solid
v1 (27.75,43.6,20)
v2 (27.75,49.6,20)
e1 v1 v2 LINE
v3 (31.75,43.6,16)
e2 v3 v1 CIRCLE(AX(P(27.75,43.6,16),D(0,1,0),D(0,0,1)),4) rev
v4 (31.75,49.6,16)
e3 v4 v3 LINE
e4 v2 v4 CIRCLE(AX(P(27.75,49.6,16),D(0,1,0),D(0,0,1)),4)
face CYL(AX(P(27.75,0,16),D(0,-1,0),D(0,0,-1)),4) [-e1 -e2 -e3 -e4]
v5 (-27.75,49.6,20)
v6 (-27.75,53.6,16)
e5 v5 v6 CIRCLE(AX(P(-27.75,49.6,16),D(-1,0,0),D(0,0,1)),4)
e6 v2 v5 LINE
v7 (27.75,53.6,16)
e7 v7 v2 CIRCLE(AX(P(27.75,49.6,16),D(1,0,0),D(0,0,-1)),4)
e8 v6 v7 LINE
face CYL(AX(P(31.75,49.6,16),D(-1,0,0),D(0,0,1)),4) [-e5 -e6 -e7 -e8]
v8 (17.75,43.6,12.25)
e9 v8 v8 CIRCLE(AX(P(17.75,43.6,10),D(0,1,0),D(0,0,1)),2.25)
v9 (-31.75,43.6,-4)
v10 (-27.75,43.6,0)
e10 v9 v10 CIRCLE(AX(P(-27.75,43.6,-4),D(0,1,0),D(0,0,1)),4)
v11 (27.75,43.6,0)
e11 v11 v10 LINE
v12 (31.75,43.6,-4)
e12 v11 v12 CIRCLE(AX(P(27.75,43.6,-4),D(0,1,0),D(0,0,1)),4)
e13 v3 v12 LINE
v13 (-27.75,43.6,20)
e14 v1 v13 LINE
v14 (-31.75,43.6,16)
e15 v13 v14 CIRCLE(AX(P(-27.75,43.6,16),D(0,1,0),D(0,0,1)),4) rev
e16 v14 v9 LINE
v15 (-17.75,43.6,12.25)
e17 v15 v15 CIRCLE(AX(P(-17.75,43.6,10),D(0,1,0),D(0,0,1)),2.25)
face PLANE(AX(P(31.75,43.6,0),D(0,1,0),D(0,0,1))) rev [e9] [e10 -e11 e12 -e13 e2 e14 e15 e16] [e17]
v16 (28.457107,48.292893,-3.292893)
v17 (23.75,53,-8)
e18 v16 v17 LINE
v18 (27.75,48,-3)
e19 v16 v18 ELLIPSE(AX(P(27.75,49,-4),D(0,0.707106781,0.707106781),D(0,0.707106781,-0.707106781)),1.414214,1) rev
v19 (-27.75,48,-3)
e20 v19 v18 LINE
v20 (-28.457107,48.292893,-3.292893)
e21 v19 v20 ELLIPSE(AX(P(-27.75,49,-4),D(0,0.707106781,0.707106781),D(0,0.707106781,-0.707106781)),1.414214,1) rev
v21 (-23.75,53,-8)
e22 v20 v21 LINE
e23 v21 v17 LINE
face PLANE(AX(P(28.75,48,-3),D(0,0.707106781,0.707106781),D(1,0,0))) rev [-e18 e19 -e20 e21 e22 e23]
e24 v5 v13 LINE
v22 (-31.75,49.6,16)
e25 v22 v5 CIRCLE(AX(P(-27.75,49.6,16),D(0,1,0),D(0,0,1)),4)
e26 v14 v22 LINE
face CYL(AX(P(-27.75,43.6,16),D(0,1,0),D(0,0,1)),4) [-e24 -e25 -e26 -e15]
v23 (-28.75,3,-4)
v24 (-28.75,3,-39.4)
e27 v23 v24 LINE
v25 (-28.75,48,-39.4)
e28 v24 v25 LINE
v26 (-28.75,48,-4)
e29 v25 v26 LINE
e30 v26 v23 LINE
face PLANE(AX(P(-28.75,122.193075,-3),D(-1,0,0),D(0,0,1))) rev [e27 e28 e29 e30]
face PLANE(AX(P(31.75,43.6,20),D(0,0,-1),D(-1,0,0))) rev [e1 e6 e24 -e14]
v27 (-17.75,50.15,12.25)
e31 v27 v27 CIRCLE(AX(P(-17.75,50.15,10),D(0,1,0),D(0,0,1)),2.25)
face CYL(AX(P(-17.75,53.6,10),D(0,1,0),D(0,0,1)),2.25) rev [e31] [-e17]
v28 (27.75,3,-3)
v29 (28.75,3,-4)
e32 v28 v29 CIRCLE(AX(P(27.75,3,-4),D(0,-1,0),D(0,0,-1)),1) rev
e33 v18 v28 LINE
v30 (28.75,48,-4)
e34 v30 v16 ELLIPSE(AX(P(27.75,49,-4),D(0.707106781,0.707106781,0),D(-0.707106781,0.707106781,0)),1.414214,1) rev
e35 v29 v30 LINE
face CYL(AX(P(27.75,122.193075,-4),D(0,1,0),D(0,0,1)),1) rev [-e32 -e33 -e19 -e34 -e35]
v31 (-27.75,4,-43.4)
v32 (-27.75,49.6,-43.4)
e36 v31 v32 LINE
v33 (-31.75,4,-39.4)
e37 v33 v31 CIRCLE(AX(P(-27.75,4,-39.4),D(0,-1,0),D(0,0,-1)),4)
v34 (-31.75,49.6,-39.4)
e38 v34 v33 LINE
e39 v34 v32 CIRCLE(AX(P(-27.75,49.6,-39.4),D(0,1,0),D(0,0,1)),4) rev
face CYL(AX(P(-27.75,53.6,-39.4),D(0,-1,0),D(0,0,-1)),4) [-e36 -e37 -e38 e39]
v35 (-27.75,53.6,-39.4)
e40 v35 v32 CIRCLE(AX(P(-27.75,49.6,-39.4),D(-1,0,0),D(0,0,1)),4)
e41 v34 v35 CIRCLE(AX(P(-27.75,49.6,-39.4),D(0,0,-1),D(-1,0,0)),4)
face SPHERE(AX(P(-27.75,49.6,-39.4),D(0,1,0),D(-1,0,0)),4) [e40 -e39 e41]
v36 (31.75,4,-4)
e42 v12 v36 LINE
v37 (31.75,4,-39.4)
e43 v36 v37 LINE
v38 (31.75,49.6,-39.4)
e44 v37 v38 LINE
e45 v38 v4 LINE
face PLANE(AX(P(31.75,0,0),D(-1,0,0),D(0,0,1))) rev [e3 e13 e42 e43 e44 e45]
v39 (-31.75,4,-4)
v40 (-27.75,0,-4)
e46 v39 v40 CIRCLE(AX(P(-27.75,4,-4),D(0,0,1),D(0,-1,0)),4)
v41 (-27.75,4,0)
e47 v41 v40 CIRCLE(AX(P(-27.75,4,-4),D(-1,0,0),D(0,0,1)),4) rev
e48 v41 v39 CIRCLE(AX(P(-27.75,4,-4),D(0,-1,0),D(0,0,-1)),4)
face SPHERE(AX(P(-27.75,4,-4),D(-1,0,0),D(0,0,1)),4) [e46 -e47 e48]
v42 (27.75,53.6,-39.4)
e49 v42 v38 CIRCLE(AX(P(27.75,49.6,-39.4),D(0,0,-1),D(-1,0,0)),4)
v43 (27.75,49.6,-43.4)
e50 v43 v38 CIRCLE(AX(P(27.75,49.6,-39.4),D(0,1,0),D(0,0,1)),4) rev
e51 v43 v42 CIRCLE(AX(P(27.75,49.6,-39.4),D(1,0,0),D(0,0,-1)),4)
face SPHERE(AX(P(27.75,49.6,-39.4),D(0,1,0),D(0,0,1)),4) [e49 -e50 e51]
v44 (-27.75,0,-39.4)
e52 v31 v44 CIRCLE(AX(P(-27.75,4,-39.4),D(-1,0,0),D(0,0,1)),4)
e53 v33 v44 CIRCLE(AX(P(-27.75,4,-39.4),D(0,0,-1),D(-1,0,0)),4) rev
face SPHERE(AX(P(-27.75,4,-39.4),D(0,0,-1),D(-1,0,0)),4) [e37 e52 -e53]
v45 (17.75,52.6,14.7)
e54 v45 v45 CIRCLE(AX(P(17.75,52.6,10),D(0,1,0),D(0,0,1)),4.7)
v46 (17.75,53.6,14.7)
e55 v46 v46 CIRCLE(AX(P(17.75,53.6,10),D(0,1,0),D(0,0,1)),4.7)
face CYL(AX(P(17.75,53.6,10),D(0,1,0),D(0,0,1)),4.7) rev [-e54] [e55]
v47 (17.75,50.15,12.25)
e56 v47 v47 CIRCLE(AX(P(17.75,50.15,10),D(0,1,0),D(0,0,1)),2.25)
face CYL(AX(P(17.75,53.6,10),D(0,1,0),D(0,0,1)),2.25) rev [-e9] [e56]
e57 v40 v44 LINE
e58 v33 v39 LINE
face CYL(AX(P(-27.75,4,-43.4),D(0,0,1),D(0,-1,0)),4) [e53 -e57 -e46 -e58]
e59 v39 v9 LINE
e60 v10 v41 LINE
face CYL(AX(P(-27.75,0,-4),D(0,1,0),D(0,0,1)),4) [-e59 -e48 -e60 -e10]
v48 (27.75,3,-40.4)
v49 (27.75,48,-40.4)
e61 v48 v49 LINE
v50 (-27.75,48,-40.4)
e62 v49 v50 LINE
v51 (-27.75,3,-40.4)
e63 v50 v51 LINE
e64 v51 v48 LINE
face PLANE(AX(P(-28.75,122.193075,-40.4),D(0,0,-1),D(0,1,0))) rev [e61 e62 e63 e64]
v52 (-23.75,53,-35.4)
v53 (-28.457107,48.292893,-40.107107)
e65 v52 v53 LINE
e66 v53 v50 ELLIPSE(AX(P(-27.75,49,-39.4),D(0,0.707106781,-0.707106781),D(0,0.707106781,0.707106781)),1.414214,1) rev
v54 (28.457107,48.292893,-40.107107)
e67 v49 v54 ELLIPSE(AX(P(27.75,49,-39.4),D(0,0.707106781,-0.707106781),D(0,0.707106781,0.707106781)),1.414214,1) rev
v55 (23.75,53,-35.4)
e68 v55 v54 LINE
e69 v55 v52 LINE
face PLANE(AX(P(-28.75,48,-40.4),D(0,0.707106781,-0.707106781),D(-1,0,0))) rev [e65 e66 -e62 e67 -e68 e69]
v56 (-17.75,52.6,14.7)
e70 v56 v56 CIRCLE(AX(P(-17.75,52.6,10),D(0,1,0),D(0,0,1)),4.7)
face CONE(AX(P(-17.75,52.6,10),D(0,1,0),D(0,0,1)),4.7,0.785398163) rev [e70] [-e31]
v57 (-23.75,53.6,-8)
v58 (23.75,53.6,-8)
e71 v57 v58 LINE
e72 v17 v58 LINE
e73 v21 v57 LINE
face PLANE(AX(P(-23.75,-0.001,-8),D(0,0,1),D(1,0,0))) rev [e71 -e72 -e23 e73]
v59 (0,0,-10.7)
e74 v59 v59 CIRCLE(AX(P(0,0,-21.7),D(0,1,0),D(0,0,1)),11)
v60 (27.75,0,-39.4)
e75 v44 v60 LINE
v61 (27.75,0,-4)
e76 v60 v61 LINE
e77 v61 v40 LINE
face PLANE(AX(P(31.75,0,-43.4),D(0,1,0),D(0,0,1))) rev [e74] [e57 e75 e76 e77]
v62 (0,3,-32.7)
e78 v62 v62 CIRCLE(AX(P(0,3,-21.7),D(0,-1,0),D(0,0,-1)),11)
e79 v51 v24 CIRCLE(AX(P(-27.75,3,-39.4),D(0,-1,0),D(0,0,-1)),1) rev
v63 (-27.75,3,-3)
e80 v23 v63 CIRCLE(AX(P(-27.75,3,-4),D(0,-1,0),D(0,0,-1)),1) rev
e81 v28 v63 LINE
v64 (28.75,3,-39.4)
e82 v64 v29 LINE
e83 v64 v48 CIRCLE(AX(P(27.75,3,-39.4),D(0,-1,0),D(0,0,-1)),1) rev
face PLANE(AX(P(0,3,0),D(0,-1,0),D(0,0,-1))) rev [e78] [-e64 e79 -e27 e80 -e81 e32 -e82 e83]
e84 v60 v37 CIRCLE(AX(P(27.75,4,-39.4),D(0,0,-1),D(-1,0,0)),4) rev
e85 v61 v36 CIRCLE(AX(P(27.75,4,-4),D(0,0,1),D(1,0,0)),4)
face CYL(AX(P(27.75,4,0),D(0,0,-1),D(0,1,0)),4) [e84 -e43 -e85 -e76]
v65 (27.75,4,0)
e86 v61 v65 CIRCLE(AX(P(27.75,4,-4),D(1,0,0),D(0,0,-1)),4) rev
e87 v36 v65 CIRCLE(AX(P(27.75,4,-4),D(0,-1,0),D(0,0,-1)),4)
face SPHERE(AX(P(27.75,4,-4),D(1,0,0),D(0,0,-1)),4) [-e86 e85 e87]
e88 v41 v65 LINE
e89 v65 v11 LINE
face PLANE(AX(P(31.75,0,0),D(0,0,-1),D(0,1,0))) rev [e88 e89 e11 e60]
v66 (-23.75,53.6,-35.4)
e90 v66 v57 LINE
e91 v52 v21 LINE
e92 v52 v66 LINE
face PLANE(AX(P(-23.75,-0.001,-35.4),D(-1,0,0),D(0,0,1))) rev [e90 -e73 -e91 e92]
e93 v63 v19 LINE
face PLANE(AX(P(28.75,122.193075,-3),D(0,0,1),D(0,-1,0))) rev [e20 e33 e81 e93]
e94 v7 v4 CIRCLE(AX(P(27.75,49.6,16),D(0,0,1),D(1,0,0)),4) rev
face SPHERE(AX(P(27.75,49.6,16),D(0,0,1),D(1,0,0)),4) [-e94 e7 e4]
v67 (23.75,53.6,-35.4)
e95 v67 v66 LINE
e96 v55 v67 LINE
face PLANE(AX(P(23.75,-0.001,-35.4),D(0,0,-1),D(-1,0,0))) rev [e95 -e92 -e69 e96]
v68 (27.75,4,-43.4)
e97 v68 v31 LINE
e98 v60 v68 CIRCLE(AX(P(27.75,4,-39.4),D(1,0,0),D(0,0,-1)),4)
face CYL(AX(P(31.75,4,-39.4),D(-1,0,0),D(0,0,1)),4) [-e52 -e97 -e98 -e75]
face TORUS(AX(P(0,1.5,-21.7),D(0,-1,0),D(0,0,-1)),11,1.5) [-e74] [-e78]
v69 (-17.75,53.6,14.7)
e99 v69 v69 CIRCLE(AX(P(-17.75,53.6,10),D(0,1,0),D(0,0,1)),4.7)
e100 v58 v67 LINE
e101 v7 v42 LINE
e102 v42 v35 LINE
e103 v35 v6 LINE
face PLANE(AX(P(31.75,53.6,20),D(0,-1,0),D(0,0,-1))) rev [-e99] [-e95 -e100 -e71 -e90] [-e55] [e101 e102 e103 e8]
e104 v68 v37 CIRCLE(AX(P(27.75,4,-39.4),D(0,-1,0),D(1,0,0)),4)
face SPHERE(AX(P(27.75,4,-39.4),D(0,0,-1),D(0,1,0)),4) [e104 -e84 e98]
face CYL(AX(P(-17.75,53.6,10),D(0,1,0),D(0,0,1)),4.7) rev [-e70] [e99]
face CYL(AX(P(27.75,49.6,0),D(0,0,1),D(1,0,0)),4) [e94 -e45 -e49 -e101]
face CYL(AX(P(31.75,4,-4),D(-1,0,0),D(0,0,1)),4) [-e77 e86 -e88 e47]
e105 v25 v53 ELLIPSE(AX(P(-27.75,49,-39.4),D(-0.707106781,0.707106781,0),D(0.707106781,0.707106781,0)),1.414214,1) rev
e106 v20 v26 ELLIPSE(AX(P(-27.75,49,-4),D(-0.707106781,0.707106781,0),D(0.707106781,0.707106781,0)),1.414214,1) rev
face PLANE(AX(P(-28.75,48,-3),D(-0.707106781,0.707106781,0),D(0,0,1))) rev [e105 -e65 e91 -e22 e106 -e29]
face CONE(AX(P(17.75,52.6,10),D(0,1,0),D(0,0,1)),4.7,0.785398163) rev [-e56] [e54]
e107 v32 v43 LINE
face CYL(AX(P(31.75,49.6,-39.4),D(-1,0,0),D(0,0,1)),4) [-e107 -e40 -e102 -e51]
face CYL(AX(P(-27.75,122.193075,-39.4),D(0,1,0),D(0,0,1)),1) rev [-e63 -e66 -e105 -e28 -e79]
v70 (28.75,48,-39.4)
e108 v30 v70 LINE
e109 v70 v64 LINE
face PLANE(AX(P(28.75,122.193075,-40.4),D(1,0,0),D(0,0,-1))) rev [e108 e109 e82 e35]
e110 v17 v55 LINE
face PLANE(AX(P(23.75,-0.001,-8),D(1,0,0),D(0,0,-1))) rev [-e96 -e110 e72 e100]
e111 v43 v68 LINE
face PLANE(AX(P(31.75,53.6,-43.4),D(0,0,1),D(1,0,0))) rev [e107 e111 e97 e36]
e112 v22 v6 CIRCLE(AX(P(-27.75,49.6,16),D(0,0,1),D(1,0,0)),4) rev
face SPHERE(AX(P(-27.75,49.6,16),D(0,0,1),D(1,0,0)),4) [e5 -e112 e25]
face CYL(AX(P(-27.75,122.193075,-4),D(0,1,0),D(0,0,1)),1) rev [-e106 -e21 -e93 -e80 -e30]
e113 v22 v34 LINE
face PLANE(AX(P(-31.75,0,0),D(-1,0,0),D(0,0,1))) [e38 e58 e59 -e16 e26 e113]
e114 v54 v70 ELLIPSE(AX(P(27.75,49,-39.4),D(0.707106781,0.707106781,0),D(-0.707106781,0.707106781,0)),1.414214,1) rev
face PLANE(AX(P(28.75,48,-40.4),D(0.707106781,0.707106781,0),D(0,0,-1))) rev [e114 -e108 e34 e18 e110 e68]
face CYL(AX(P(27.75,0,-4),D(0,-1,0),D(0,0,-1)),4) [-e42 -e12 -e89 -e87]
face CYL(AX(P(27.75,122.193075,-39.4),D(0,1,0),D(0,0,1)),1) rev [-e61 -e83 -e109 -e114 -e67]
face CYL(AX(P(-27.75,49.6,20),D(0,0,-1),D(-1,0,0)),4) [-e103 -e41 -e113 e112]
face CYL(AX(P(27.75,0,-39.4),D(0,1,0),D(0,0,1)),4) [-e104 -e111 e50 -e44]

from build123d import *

# Parameters (mm, degrees)
PROFILE_EXTRUDE_DEPTH         = 31.75
INTERIOR_START                = -3
INTERIOR_SKETCH_W             = 57.5
INTERIOR_SKETCH_H             = 37.4
INTERIOR_CUT_DEPTH            = 50
OPENING_CUT_REACH             = 77.925
OPENING_SKETCH_W              = 47.5
OPENING_SKETCH_H              = 27.4
INSIDE_TOP_CHAMFER_SIZE       = 5
INSIDE_FILLETS_R              = 1
WIRE_OUTLET_CUT_REACH         = 77.925
WIRE_OUTLET_CUT_SKETCH_R      = 9.5
WIRE_OUTLET_FILLET_R          = 1.5
TOP_FILLETS_R                 = 4
M4_MOUNTING_SCREWS_AT_2_COUNT = 2
M4_MOUNTING_SCREWS_AT_2_PITCH = 35.5


with BuildPart() as part:
    # Profile Sketch → Profile Extrude (new, symmetric)
    with BuildSketch(Plane(origin=(0, 0, 0), x_dir=(0, 0, -1), z_dir=(1, 0, 0))):
        Polygon((0, 0), (0, 43.6), (-20, 43.6), (-20, 53.6), (43.4, 53.6), (43.4, 0), align=None)
    extrude(amount=PROFILE_EXTRUDE_DEPTH, both=True)

    # Interior Sketch → Interior Cut (cut)
    with BuildSketch(Plane.XZ.offset(INTERIOR_START)):
        with Locations((0, -21.7)):
            Rectangle(INTERIOR_SKETCH_W, INTERIOR_SKETCH_H)
    extrude(amount=-INTERIOR_CUT_DEPTH, mode=Mode.SUBTRACT)

    # Opening Sketch → Opening Cut (cut, up to next)
    with BuildSketch(Plane(origin=(0, 53.6, 0), x_dir=(1, 0, 0), z_dir=(0, 1, 0)), mode=Mode.PRIVATE) as opening_cut_sk1:
        with Locations((0, 21.7)):
            Rectangle(OPENING_SKETCH_W, OPENING_SKETCH_H)
    opening_cut_tool1 = extrude(opening_cut_sk1.sketch, amount=-OPENING_CUT_REACH, mode=Mode.PRIVATE) & part.part
    add(opening_cut_tool1.solids().sort_by_distance((0, 53.6, -21.7))[0], mode=Mode.SUBTRACT)

    # Inside Top Chamfer
    inside_top_chamfer_edges = [part.edges().sort_by_distance(p)[0] for p in [
        (0, 53, -3),
        (28.75, 53, -21.7),
        (0, 53, -40.4),
        (-28.75, 53, -21.7),
    ]]
    chamfer(inside_top_chamfer_edges, length=INSIDE_TOP_CHAMFER_SIZE - 0.0001)  # a hair under: the kernel refuses the full size

    # Inside Fillets
    inside_fillets_edges = [part.edges().sort_by_distance(p)[0] for p in [
        (28.75, 25.50005, -40.4),
        (28.75, 25.50005, -3),
        (-28.75, 25.50005, -40.4),
        (-28.75, 25.50005, -3),
    ]]
    fillet(inside_fillets_edges, radius=INSIDE_FILLETS_R)

    # Wire Outlet Cut Sketch → Wire Outlet Cut (cut, up to next)
    with BuildSketch(Plane.XZ, mode=Mode.PRIVATE) as wire_outlet_cut_sk1:
        with Locations(Location((0, -21.7, 0), (0, 0, 270))):
            Circle(WIRE_OUTLET_CUT_SKETCH_R)
    wire_outlet_cut_tool1 = extrude(wire_outlet_cut_sk1.sketch, amount=-WIRE_OUTLET_CUT_REACH, mode=Mode.PRIVATE) & part.part
    add(wire_outlet_cut_tool1.solids().sort_by_distance((0, 0, -21.7))[0], mode=Mode.SUBTRACT)

    # Wire Outlet Fillet
    wire_outlet_fillet_edges = [part.edges().sort_by_distance(p)[0] for p in [
        (0, 0, -12.2),
        (0, 3, -12.2),
    ]]
    fillet(wire_outlet_fillet_edges, radius=WIRE_OUTLET_FILLET_R - 0.0001)  # a hair under: the kernel refuses the full size

    # Top Fillets
    top_fillets_edges = [part.edges().sort_by_distance(p)[0] for p in [
        (0, 0, 0),
        (0, 53.6, 20),
        (0, 53.6, -43.4),
        (0, 0, -43.4),
        (31.75, 53.6, -11.7),
        (31.75, 48.6, 20),
        (31.75, 21.8, 0),
        (31.75, 0, -21.7),
        (-31.75, 21.8, 0),
        (-31.75, 48.6, 20),
        (-31.75, 53.6, -11.7),
        (-31.75, 26.8, -43.4),
        (-31.75, 0, -21.7),
        (31.75, 26.8, -43.4),
    ]]
    fillet(top_fillets_edges, radius=TOP_FILLETS_R)

    # M4 Mounting Screws Profile Sketch → M4 Mounting Screws (revolve, cut)
    with BuildSketch(Plane(origin=(-17.75, 53.6, 10), x_dir=(0, 0, 1), z_dir=(1, 0, 0))):
        Polygon((0, 0), (0, 10), (2.25, 10), (2.25, 3.45), (4.7, 1), (4.7, 0), align=None)
    m4_mounting_screws = revolve(axis=Axis((-17.75, 59.95, 10), (0, -1, 0)), mode=Mode.SUBTRACT)

    # M4 Mounting Screws at 2: M4 Mounting Screws ×2
    with Locations(*[(i * M4_MOUNTING_SCREWS_AT_2_PITCH, 0, 0) for i in range(1, M4_MOUNTING_SCREWS_AT_2_COUNT)]):
        add(m4_mounting_screws, mode=Mode.SUBTRACT)


solid = part.part
